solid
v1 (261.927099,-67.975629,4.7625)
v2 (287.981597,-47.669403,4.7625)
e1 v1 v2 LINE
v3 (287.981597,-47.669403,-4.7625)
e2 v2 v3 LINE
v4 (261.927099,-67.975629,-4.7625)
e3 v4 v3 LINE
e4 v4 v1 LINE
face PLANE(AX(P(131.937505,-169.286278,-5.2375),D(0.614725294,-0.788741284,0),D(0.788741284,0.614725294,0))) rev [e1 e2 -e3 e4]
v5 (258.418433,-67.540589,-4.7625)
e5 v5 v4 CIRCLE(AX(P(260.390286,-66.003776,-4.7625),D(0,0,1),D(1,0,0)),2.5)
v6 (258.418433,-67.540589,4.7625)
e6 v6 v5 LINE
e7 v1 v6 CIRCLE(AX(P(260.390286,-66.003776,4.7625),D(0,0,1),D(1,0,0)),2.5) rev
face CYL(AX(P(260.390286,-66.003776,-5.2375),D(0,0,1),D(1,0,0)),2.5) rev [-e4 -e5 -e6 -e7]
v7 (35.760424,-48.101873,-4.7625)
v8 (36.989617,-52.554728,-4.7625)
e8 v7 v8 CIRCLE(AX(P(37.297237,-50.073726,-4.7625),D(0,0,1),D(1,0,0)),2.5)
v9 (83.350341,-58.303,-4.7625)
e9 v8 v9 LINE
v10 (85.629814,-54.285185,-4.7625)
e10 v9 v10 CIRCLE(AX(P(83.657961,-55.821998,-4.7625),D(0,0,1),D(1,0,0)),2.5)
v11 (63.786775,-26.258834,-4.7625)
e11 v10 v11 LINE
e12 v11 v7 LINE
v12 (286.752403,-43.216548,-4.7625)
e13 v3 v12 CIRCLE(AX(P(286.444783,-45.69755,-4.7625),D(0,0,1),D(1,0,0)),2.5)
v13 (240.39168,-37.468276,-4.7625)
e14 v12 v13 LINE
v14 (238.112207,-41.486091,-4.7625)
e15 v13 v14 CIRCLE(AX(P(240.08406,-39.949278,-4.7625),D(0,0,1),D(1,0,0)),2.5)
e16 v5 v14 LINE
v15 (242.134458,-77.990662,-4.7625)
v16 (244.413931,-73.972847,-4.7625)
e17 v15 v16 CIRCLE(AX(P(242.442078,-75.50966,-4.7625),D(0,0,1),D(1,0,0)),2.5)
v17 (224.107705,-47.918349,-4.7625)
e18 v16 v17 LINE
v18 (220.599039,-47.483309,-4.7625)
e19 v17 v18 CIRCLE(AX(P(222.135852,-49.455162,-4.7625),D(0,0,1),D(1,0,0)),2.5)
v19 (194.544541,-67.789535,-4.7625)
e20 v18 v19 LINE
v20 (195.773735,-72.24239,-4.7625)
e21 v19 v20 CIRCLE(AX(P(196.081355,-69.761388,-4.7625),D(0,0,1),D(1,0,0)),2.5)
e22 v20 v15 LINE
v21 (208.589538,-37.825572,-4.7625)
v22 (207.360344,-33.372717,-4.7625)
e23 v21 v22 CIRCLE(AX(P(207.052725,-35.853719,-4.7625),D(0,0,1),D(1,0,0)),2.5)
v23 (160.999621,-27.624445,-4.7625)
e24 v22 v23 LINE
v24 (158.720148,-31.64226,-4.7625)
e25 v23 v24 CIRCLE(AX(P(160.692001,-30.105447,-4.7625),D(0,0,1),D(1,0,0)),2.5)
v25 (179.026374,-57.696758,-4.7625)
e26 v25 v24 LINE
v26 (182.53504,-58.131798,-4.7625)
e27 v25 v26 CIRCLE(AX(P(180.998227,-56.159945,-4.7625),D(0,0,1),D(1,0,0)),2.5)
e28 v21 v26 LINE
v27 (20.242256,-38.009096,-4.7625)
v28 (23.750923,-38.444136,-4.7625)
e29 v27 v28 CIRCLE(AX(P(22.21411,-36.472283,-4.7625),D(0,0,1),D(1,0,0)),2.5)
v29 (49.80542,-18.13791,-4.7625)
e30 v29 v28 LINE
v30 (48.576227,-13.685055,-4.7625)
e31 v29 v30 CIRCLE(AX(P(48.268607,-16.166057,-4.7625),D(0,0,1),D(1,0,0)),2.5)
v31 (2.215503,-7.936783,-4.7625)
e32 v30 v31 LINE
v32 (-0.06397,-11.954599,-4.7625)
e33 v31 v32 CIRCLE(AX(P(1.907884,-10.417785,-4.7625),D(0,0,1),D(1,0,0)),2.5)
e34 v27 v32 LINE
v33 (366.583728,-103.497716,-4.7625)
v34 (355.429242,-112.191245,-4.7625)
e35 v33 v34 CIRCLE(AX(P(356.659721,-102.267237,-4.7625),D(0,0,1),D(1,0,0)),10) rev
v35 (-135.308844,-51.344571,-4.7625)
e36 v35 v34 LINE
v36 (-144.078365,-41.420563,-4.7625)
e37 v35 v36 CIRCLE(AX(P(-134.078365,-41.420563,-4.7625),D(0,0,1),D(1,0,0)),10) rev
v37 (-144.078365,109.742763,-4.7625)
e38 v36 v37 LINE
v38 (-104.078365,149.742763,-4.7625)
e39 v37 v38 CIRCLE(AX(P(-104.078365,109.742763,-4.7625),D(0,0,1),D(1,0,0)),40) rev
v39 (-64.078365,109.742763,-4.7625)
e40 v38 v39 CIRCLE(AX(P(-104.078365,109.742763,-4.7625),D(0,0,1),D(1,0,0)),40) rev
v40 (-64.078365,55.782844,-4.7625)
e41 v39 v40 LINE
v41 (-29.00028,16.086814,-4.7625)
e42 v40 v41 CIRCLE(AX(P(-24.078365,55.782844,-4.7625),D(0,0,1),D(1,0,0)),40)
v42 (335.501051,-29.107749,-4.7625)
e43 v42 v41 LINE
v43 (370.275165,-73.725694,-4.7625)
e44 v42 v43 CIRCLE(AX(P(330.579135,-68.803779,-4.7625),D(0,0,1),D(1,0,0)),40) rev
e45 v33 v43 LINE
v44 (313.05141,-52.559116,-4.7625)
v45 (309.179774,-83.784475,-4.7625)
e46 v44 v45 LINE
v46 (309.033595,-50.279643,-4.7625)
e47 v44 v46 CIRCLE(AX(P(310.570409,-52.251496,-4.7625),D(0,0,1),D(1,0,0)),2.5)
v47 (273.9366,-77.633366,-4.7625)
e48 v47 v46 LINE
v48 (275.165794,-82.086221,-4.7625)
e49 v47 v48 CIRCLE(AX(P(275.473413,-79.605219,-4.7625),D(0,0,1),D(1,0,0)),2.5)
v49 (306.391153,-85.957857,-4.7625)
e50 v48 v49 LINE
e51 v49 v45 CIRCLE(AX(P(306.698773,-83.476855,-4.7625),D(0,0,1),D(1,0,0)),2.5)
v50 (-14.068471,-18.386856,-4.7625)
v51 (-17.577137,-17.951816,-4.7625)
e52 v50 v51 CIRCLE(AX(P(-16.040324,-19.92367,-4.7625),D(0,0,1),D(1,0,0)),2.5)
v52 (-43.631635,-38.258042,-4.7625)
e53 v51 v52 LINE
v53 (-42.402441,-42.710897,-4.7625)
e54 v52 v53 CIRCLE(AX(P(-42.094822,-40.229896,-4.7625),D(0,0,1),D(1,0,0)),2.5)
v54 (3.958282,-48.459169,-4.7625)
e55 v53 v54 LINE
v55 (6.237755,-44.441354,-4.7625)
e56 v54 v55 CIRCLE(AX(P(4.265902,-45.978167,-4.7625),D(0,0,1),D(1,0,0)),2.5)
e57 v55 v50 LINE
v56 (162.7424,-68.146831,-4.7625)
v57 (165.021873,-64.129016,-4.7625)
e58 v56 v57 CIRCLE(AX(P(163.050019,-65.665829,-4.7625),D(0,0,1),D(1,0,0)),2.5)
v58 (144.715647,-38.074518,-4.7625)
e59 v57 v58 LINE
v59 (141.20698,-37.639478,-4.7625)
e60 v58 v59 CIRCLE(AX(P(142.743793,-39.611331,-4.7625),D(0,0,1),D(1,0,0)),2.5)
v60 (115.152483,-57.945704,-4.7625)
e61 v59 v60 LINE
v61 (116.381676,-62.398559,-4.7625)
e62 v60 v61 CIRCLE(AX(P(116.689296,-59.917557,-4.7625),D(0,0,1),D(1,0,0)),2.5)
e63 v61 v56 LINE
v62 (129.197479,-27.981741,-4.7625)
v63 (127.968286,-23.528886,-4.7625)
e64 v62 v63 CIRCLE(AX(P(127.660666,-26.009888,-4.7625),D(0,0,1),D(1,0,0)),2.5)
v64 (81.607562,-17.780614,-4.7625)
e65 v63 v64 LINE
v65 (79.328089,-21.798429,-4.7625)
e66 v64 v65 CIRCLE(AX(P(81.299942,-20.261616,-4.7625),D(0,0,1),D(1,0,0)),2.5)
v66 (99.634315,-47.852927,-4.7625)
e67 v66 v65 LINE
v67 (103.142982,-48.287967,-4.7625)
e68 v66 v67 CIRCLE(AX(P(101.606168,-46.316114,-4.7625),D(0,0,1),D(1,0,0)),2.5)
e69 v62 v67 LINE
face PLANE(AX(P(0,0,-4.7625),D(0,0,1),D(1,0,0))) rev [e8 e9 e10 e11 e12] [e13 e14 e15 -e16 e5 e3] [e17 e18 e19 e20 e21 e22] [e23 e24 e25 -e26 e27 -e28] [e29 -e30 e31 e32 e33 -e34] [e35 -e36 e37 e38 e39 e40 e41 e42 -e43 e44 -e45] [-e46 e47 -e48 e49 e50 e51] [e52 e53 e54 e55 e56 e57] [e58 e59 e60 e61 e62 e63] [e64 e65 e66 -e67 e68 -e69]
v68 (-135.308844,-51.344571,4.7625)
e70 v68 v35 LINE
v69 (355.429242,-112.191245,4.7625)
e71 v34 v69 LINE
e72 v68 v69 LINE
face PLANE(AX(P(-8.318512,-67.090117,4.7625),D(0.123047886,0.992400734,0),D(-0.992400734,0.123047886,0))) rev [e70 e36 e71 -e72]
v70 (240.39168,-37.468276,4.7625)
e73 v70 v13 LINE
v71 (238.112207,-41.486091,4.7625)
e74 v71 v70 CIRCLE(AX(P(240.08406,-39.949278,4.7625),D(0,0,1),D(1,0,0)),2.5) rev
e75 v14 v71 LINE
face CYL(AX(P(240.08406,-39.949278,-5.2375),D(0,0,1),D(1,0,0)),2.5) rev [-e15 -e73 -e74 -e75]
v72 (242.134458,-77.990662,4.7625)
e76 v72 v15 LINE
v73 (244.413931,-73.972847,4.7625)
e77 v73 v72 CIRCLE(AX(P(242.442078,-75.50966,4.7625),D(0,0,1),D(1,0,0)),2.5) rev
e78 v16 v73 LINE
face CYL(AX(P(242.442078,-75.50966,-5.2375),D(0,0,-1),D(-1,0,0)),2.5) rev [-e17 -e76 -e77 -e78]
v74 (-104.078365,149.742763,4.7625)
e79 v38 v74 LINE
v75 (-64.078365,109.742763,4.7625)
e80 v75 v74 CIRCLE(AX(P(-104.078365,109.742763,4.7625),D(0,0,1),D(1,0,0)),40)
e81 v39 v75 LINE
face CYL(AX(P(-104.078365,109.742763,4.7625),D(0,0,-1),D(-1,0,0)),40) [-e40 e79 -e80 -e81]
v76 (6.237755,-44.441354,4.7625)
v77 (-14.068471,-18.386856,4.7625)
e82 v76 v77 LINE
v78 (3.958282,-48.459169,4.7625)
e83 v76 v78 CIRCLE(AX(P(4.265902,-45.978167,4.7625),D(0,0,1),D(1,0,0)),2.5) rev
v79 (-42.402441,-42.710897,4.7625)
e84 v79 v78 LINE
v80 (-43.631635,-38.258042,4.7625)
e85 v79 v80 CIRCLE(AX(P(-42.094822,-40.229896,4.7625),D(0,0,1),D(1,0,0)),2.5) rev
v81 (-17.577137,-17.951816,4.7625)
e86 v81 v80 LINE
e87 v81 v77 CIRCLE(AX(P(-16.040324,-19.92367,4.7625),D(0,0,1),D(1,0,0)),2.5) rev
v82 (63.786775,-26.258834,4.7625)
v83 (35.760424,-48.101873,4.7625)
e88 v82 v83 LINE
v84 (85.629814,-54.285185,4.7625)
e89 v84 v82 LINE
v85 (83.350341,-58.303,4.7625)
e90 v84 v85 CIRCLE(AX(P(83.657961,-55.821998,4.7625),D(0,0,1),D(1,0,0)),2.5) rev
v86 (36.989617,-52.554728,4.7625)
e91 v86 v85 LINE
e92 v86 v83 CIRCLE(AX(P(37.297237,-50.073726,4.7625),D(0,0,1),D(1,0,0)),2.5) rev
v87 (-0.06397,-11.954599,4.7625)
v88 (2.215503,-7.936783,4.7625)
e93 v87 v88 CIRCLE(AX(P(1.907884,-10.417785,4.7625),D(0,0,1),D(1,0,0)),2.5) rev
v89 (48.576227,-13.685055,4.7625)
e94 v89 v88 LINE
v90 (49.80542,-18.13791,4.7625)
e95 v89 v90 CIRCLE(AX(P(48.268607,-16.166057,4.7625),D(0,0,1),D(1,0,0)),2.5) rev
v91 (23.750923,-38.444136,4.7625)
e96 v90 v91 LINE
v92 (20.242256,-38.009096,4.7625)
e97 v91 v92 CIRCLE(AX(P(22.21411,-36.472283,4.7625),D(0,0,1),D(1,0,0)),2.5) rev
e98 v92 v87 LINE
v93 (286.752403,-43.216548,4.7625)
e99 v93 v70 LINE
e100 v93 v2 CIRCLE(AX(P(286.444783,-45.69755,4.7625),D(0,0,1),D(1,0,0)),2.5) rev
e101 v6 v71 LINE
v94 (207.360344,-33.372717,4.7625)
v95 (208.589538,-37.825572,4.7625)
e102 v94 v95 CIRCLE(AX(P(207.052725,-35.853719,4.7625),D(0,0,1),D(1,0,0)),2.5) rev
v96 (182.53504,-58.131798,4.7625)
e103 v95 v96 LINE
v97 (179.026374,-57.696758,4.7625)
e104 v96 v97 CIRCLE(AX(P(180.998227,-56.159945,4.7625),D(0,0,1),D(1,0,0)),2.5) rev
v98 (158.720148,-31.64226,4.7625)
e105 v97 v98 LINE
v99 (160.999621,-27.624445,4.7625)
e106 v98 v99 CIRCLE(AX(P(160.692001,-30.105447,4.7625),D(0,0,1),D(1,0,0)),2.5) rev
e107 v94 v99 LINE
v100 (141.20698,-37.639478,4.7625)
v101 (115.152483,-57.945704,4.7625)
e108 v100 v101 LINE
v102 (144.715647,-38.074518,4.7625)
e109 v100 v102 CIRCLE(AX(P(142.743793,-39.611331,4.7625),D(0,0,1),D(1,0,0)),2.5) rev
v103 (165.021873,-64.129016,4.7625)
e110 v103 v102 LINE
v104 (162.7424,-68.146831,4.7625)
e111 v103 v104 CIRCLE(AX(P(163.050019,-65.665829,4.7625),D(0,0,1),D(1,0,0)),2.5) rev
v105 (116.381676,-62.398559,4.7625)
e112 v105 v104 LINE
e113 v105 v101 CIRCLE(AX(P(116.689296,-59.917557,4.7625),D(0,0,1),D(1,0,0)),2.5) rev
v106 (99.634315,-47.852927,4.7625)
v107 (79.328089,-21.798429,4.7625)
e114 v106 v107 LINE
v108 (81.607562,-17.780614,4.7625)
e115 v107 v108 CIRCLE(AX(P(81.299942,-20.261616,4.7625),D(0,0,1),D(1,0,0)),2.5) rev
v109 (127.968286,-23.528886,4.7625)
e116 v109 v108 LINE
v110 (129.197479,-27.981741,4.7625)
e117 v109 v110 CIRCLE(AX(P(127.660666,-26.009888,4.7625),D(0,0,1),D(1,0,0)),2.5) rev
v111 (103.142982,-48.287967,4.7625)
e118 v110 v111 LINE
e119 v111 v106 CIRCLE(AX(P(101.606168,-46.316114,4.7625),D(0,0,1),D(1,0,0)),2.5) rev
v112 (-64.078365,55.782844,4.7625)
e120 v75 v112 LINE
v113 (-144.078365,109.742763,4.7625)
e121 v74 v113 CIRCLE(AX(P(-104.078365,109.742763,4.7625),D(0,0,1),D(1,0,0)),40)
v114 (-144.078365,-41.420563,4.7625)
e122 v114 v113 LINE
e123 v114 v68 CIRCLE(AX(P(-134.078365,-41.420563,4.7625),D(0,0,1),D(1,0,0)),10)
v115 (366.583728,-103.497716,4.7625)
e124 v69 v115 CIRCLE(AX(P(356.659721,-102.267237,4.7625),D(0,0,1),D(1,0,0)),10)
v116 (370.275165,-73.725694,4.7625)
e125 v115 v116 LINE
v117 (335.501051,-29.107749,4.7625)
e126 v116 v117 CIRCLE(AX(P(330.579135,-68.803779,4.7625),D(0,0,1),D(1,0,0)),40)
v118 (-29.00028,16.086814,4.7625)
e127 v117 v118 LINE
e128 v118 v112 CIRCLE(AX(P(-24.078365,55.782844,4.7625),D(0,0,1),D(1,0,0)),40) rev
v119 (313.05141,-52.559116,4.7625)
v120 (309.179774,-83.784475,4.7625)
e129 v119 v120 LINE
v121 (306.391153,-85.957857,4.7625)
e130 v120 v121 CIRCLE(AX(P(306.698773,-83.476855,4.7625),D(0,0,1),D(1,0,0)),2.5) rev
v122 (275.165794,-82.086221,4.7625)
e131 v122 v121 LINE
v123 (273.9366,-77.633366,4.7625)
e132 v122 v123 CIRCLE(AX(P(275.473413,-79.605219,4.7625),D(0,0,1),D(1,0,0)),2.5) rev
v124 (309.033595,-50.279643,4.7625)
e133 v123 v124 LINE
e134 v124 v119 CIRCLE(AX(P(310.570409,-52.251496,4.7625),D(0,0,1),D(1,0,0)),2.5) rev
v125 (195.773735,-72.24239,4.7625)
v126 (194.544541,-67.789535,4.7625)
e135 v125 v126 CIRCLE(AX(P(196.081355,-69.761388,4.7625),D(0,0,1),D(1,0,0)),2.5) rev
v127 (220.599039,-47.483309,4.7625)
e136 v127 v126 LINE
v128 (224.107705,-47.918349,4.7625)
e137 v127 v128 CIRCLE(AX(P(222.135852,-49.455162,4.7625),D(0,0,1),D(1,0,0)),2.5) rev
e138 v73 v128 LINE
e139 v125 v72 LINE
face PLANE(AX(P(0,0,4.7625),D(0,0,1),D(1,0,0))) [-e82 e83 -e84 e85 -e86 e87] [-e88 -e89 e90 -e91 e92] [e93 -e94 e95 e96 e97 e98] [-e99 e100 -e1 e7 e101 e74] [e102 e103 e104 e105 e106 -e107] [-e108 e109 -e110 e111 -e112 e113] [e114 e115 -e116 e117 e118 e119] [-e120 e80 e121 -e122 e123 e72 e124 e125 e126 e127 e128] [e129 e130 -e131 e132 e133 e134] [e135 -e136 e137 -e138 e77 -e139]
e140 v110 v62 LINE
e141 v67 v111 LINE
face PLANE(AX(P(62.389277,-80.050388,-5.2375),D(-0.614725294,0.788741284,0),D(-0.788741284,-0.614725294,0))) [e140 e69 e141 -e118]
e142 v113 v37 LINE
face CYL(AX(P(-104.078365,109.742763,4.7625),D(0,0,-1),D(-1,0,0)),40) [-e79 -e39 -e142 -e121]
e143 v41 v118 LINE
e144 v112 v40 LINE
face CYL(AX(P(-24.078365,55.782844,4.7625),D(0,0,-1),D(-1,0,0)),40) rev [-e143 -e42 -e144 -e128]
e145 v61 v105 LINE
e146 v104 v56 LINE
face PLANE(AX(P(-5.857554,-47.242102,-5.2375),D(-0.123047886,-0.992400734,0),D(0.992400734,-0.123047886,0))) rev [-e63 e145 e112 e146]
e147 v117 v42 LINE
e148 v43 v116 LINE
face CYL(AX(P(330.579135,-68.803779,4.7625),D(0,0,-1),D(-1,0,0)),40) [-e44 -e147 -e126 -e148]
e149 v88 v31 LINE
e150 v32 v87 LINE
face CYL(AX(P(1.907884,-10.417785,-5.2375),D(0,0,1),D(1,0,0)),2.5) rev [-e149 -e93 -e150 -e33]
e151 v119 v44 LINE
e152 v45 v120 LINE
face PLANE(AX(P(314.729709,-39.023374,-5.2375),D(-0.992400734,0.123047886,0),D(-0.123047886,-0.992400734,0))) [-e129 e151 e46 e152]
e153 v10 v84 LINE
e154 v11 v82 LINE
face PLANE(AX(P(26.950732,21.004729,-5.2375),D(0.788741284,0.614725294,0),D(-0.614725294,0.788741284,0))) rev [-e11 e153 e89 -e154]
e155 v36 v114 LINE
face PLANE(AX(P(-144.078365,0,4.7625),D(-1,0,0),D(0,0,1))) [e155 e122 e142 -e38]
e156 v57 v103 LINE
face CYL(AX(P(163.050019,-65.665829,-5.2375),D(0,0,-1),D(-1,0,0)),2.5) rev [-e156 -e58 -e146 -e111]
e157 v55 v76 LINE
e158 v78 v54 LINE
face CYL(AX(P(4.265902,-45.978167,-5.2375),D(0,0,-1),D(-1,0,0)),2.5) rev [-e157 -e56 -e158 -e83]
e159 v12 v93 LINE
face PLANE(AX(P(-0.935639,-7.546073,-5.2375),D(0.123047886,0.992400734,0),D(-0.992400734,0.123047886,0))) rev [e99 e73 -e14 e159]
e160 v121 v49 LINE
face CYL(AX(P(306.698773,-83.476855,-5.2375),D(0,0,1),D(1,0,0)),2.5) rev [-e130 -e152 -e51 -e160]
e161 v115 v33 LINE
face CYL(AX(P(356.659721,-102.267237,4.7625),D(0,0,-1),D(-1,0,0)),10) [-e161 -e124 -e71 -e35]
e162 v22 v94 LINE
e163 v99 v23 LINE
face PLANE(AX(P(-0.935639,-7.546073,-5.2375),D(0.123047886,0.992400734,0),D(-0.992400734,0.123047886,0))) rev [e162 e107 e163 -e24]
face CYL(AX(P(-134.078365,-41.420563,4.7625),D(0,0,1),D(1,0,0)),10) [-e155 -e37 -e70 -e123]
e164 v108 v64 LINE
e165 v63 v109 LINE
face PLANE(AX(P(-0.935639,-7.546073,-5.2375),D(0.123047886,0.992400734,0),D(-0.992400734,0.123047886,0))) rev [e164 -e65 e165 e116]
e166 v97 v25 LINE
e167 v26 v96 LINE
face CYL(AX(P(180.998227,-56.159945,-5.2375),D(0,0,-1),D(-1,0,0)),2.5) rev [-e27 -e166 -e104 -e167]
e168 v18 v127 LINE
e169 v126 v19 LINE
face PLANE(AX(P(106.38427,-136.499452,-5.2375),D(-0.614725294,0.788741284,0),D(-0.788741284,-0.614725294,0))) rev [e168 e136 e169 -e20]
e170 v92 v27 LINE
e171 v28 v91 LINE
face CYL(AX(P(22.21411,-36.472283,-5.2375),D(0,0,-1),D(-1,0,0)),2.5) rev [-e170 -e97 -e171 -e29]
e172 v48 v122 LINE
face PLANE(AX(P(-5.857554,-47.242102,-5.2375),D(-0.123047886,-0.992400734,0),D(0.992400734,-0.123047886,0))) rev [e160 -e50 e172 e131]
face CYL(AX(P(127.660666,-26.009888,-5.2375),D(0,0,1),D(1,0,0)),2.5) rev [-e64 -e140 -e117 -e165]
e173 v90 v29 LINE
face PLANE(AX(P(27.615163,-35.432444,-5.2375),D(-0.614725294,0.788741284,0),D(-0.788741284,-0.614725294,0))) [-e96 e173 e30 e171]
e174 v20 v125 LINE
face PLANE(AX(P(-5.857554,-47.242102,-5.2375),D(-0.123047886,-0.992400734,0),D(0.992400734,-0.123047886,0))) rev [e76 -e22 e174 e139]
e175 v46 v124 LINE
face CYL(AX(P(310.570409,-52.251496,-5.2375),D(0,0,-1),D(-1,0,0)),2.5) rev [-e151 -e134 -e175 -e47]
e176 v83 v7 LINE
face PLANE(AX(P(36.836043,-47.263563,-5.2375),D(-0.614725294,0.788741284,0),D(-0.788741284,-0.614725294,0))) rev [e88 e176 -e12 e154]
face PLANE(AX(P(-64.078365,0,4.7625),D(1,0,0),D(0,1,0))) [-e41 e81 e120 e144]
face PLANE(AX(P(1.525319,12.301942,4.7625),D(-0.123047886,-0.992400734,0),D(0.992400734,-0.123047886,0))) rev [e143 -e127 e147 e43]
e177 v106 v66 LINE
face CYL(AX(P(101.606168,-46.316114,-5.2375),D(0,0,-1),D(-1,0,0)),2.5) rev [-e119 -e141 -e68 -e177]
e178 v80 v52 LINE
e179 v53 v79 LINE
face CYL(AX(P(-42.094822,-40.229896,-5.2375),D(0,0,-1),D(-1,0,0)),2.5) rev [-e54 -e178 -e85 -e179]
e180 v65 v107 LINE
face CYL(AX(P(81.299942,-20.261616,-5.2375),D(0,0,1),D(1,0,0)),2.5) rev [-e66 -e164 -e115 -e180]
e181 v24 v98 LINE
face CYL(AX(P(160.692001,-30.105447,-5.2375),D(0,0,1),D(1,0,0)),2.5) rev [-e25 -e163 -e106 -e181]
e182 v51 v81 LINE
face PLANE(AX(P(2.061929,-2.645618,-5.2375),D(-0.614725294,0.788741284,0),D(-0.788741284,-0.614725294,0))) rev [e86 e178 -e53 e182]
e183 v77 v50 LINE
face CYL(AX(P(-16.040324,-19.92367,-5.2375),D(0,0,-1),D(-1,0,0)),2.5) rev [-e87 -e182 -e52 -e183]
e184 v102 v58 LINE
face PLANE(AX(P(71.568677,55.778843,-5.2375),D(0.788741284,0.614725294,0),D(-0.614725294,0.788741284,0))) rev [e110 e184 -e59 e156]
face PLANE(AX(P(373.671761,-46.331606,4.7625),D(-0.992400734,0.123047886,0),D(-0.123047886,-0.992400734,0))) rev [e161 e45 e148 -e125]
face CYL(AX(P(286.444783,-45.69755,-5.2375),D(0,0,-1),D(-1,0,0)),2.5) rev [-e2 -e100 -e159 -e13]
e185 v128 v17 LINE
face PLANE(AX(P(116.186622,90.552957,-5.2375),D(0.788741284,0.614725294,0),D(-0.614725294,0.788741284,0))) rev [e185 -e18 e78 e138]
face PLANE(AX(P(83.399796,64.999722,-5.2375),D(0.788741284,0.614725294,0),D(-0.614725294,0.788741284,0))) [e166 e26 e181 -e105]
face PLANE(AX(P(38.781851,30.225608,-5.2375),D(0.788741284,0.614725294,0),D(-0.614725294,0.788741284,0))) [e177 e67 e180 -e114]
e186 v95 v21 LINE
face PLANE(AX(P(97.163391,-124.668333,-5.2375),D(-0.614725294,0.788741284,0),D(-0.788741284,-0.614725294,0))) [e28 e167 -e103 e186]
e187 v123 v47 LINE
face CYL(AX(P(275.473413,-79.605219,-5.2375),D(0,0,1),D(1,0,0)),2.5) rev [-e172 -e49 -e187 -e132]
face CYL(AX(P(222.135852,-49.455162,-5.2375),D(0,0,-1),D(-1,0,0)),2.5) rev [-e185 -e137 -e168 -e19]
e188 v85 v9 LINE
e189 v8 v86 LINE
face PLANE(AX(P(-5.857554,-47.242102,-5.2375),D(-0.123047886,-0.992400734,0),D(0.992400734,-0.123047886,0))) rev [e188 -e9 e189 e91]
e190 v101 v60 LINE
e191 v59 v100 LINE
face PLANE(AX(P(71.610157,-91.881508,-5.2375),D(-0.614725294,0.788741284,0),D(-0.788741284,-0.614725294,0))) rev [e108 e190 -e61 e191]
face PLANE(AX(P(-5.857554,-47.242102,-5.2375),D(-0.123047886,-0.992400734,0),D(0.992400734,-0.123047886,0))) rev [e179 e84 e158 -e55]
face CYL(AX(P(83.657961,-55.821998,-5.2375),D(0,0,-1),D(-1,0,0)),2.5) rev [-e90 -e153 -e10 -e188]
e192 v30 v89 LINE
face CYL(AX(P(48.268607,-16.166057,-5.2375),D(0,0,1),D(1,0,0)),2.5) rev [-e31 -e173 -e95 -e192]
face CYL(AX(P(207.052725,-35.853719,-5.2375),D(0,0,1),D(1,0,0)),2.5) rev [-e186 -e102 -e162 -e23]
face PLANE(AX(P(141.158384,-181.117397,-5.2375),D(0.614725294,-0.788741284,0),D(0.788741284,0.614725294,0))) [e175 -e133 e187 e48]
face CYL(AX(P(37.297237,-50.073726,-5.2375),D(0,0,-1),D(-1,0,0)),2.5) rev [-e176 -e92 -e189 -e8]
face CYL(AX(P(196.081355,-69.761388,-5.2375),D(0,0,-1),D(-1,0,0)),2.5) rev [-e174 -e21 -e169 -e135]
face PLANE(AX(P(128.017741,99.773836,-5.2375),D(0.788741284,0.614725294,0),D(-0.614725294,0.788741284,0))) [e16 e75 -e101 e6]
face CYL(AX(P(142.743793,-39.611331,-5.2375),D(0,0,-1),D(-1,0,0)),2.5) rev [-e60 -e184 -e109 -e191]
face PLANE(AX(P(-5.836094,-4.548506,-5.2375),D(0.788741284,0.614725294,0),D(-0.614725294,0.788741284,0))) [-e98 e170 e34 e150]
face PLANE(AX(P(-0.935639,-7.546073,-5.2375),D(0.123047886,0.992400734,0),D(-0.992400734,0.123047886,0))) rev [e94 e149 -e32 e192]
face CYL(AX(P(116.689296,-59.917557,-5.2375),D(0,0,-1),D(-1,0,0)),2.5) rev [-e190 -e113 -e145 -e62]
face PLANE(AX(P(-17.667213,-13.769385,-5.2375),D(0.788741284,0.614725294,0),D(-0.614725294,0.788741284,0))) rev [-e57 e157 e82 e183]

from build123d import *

# Parameters (mm, degrees)
SKETCH1_R           = 7.9375
SKETCH1_R_2         = 4.7879
BOSS_EXTRUDE1_DEPTH = 4.7625
FILLET3_R           = 40
FILLET4_R           = 10
CUT_EXTRUDE1_DEPTH  = 10
FILLET5_R           = 2.5
SKETCH30_R          = 7.9375
SKETCH30_R_2        = 4.7879
BOSS_EXTRUDE2_DEPTH = 9.525


with BuildPart() as part:
    # Sketch1 → Boss-Extrude1 (new, symmetric)
    with BuildSketch(Plane.XY):
        Polygon((-144.07836487, 49.742763384), (-144.07836487, -50.257236616), (365.353249064, -113.421723532), (375.197079951, -34.029664776), (-64.07836487, 20.436150317), (-64.07836487, 149.742763384), (-144.07836487, 149.742763384), align=None)
        with Locations(Location((-104.07836487, 109.742763384, 0), (0, 0, 180))):
            Circle(SKETCH1_R, mode=Mode.SUBTRACT)
        with Locations(Location((330.57913513, -68.80377871, 0), (0, 0, 180))):
            Circle(SKETCH1_R_2, mode=Mode.SUBTRACT)
    extrude(amount=BOSS_EXTRUDE1_DEPTH, both=True)

    # Fillet3
    fillet3_edges = [part.edges().sort_by_distance(p)[0] for p in [
        (-64.07836487, 20.436150317, 0),
        (-64.07836487, 149.742763384, 0),
        (-144.07836487, 149.742763384, 0),
        (375.197079951, -34.029664776, 0),
    ]]
    fillet(fillet3_edges, radius=FILLET3_R - 0.0001)  # a hair under: the kernel refuses the full size

    # Fillet4
    fillet4_edges = [part.edges().sort_by_distance(p)[0] for p in [
        (365.353249064, -113.421723532, 0),
        (-144.07836487, -50.257236616, 0),
    ]]
    fillet(fillet4_edges, radius=FILLET4_R)

    # Sketch16 → Cut-Extrude1 (cut)
    with BuildSketch(Plane.XY.offset(4.7625)):
        Polygon((54.565895217, -14.427714854), (-3.774164869, -7.194123807), (21.77906965, -39.980949374), align=None)
        Polygon((-15.605284124, -16.415003221), (-48.392109691, -41.968237741), (9.947950395, -49.201828788), align=None)
        Polygon((133.957953972, -24.271545742), (75.617893886, -17.037954695), (101.171128405, -49.824780261), align=None)
        Polygon((63.786774631, -26.258834109), (30.999949065, -51.812068628), (89.340009151, -59.045659676), align=None)
        Polygon((213.350012728, -34.11537663), (155.009952642, -26.881785582), (180.563187161, -59.668611149), align=None)
        Polygon((143.178833387, -36.102664997), (110.39200782, -61.655899516), (168.732067906, -68.889490564), align=None)
        Polygon((292.742071484, -43.959207518), (234.402011397, -36.72561647), (259.955245917, -69.512442037), align=None)
        Polygon((222.570892143, -45.946495885), (189.784066576, -71.499730404), (248.124126662, -78.733321452), align=None)
        Polygon((313.794070153, -46.569447358), (269.176125331, -81.343561292), (308.872154709, -86.265476736), align=None)
    extrude(amount=-CUT_EXTRUDE1_DEPTH, mode=Mode.SUBTRACT)

    # Fillet5
    fillet5_edges = [part.edges().sort_by_distance(p)[0] for p in [
        (110.39200782, -61.655899516, 0),
        (143.178833387, -36.102664997, 0),
        (168.732067906, -68.889490564, 0),
        (292.742071484, -43.959207518, 0),
        (259.955245917, -69.512442037, 0),
        (234.402011397, -36.72561647, 0),
        (189.784066576, -71.499730404, 0),
        (222.570892143, -45.946495885, 0),
        (248.124126662, -78.733321452, 0),
        (-48.392109691, -41.968237741, 0),
        (-15.605284124, -16.415003221, 0),
        (9.947950395, -49.201828788, 0),
        (30.999949065, -51.812068628, 0),
        (89.340009151, -59.045659676, 0),
        (54.565895217, -14.427714854, 0),
        (21.77906965, -39.980949374, 0),
        (-3.774164869, -7.194123807, 0),
        (133.957953972, -24.271545742, 0),
        (101.171128405, -49.824780261, 0),
        (75.617893886, -17.037954695, 0),
        (269.176125331, -81.343561292, 0),
        (313.794070153, -46.569447358, 0),
        (308.872154709, -86.265476736, 0),
        (213.350012728, -34.11537663, 0),
        (180.563187161, -59.668611149, 0),
        (155.009952642, -26.881785582, 0),
    ]]
    fillet(fillet5_edges, radius=FILLET5_R)

    # Sketch30 → Boss-Extrude2 (add)
    with BuildSketch(Plane(origin=(0, 0, -4.7625), x_dir=(-1, 0, 0), z_dir=(0, 0, -1))):
        with Locations((104.07836487, 109.742763384)):
            Circle(SKETCH30_R)
        with Locations((-330.57913513, -68.80377871)):
            Circle(SKETCH30_R_2)
    extrude(amount=-BOSS_EXTRUDE2_DEPTH)


solid = part.part
